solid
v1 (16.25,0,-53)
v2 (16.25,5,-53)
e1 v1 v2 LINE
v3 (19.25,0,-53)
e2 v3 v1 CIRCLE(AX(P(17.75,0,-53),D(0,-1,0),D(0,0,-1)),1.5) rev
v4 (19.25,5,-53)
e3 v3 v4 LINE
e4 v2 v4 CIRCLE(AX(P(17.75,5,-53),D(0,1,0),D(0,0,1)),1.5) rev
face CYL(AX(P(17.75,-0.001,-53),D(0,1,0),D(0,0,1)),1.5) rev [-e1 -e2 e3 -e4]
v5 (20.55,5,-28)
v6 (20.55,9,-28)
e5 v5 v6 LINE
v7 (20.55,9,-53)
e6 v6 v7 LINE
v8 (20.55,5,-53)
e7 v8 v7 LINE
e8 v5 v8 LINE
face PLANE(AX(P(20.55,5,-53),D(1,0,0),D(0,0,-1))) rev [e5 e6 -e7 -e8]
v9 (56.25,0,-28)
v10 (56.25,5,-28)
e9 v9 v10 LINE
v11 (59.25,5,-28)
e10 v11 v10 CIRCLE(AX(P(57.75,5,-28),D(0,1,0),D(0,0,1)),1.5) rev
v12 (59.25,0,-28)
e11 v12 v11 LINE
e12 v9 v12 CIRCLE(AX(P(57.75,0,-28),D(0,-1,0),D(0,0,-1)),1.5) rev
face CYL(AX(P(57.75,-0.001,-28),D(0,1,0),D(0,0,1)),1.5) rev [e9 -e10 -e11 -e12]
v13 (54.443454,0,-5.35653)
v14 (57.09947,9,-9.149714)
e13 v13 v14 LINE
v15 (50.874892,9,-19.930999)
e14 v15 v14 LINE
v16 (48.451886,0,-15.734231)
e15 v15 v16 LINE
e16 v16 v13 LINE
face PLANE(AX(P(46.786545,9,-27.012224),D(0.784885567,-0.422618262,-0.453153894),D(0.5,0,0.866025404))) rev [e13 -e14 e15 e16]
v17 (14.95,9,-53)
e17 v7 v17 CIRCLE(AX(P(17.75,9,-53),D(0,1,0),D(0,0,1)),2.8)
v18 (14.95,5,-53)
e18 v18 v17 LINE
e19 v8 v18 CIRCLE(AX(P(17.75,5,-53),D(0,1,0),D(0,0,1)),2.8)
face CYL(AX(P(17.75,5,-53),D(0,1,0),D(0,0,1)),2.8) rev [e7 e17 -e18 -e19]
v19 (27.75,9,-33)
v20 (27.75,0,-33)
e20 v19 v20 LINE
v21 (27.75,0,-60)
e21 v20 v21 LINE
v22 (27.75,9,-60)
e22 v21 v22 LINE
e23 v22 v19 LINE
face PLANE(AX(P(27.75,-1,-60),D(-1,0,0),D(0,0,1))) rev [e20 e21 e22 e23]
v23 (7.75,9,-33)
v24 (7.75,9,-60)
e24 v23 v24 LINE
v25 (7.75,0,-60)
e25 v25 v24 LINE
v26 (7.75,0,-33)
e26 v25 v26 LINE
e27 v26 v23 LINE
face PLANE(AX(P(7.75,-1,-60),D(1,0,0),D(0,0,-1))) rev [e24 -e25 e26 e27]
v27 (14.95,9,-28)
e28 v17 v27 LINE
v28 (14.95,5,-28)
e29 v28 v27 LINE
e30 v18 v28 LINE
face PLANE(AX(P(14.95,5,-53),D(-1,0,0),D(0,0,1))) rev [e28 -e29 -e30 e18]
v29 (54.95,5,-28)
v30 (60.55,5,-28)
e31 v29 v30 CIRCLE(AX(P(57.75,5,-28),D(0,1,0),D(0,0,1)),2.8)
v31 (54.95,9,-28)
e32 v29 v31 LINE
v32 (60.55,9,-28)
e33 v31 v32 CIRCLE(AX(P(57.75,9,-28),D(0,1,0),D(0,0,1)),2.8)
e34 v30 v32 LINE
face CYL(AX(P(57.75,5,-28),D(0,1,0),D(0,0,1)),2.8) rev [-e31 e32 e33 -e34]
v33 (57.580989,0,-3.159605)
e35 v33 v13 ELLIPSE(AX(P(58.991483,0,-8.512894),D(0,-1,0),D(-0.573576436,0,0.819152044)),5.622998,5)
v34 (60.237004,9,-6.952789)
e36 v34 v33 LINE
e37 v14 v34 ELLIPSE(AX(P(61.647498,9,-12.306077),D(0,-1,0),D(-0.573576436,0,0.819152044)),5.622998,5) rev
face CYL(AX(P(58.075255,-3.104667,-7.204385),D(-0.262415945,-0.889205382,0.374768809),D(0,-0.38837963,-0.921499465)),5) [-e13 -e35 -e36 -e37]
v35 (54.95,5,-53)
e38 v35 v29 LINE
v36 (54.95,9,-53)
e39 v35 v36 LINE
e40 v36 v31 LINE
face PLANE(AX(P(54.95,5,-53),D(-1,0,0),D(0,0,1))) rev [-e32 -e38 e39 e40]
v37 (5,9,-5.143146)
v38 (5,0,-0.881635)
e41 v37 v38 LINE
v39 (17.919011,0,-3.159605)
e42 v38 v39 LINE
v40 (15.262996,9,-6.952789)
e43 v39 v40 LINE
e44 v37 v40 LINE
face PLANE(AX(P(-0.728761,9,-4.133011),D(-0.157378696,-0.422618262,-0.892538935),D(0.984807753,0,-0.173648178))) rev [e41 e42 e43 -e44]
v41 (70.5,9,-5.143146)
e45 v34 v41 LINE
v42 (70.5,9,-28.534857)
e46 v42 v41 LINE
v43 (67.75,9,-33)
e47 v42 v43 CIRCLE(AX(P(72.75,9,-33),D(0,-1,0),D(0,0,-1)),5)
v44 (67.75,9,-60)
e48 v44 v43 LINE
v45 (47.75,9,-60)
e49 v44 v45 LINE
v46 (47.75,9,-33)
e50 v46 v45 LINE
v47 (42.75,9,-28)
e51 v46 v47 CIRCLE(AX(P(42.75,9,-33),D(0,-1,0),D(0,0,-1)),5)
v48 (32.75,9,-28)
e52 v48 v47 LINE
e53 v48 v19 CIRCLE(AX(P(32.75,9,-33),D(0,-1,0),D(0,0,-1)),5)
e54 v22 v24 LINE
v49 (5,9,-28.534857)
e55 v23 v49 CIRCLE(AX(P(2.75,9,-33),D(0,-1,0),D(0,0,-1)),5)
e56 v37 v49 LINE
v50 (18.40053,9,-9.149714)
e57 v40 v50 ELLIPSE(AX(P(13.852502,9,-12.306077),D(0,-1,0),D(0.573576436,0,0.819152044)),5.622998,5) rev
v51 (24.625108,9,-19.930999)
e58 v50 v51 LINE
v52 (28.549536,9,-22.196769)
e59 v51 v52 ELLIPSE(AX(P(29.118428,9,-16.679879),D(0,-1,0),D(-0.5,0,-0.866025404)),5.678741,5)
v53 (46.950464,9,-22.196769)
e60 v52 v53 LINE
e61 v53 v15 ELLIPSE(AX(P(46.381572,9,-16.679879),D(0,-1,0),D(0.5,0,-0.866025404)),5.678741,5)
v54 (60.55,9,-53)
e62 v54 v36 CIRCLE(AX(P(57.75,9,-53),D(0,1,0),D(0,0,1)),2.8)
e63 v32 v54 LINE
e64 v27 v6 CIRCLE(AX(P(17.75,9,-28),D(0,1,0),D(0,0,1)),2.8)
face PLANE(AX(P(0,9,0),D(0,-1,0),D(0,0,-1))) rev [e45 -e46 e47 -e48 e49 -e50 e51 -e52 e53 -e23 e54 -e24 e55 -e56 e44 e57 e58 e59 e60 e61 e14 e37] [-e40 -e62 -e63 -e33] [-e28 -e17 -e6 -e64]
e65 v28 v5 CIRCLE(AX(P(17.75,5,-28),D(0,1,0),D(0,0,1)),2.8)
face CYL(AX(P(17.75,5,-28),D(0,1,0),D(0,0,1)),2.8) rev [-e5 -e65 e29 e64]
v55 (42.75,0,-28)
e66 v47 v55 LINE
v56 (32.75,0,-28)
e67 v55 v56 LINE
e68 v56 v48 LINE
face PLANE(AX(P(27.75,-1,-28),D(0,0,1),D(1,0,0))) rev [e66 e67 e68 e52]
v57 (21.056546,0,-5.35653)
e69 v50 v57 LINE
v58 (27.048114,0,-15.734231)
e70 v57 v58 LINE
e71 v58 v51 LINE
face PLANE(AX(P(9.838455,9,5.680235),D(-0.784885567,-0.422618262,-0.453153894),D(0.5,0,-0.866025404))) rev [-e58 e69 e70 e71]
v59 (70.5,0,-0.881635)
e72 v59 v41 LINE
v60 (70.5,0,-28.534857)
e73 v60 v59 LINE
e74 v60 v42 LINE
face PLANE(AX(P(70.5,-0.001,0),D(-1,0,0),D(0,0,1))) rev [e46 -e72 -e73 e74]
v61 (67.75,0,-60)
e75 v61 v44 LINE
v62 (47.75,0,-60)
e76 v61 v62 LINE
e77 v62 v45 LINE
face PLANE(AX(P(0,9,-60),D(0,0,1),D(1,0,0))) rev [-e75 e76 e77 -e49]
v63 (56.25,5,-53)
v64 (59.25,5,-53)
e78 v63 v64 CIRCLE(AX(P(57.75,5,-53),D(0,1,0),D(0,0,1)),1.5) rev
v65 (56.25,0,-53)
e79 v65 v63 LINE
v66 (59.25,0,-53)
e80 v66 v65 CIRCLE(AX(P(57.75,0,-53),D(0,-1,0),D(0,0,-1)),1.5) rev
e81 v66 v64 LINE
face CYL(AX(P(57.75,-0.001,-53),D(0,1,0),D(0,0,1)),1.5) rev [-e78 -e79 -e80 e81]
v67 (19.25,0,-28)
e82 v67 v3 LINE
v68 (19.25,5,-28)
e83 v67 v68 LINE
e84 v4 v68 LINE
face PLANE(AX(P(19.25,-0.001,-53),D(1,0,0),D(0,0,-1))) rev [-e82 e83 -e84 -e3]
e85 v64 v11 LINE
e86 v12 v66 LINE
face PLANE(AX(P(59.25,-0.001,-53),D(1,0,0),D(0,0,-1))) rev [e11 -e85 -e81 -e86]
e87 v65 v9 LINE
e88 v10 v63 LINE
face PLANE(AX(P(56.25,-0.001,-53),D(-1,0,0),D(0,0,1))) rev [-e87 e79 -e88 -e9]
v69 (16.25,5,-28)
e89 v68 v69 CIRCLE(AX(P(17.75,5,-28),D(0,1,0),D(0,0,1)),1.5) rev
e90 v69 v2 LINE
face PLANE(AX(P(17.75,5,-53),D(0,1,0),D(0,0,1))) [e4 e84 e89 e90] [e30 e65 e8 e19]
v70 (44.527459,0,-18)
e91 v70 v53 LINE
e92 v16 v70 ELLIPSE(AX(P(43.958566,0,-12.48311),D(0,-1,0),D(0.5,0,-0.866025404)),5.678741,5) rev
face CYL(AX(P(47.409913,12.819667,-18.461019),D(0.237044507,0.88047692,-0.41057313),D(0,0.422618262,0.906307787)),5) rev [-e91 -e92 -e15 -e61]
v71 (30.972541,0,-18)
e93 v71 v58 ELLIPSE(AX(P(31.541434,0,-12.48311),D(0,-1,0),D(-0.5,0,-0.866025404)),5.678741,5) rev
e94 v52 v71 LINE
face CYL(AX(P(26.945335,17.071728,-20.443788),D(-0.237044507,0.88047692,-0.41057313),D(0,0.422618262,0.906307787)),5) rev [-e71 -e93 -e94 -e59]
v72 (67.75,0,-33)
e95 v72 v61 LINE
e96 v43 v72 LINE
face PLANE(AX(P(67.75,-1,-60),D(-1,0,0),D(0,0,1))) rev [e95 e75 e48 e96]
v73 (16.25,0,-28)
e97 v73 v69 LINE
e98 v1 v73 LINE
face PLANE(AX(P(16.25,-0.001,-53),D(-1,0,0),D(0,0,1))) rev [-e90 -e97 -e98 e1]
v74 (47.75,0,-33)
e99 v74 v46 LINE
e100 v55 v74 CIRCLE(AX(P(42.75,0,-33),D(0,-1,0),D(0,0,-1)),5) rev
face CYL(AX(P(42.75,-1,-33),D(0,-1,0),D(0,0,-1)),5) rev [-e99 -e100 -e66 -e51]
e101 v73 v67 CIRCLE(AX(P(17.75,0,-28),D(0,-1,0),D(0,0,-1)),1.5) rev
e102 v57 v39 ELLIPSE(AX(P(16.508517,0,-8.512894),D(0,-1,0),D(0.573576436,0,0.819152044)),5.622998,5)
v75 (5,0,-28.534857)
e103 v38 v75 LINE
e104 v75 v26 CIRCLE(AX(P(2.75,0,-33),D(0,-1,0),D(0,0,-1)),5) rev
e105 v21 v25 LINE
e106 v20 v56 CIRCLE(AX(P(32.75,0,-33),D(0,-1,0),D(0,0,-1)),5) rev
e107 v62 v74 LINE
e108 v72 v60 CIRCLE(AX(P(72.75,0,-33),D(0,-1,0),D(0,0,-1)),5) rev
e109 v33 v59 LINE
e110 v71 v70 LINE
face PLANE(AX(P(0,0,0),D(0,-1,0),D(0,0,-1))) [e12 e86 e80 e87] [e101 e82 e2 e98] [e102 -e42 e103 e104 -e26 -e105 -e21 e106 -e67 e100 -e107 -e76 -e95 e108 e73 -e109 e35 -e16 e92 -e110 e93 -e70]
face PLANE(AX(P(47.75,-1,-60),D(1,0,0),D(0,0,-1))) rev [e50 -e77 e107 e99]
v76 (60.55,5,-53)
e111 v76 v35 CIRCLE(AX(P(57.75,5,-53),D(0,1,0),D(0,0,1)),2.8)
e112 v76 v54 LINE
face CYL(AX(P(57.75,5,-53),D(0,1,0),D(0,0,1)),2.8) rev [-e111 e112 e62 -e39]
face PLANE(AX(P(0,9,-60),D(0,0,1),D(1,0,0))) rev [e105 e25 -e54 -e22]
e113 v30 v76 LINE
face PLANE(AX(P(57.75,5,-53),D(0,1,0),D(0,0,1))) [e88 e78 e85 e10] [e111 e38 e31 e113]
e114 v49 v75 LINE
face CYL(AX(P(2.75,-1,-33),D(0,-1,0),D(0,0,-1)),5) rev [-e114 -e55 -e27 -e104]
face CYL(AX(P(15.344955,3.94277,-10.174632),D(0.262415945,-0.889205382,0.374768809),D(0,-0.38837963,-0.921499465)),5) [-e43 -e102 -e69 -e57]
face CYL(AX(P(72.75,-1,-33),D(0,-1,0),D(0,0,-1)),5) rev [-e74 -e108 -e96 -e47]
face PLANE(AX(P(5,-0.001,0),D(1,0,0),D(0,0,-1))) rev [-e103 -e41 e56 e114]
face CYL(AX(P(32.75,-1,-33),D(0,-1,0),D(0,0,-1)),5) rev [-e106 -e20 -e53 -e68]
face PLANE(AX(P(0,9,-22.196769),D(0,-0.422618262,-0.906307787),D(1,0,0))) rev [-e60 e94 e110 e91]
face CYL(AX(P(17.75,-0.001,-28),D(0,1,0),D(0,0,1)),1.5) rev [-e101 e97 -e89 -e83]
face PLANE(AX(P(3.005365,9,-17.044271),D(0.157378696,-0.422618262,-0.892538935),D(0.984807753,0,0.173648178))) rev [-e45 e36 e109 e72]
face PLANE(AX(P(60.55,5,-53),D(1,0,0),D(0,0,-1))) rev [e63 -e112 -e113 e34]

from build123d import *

# Parameters (mm, degrees)
BOSS_EXTRUDE1_DEPTH = 9
CUT_EXTRUDE2_REACH  = 98.857
SKETCH5_W           = 20
SKETCH5_H           = 32
SKETCH5_W_2         = 7.75
CUT_EXTRUDE3_DEPTH  = 10
FILLET1_R           = 5
CUT_EXTRUDE4_DEPTH  = 4
FILLET2_R           = 5
CUT_EXTRUDE5_REACH  = 98.857
SKETCH7_W           = 5
SKETCH7_H           = 33.085129134
SKETCH7_H_2         = 33.745309592


with BuildPart() as part:
    # Sketch1 → Boss-Extrude1 (new body)
    with BuildSketch(Plane(origin=(0, 0, 0), x_dir=(1, 0, 0), z_dir=(0, 1, 0))):
        Polygon((0, 0), (0, 60), (75.5, 60), (75.5, 0), (55.5, 3.526539614), (47.14374375, 18), (28.35625625, 18), (20, 3.526539614), align=None)
    extrude(amount=BOSS_EXTRUDE1_DEPTH)

    # Sketch4 → Cut-Extrude2 (cut, up to next)
    with BuildSketch(Plane(origin=(0, 9, 0), x_dir=(1, 0, 0), z_dir=(0, 1, 0)), mode=Mode.PRIVATE) as cut_extrude2_sk1:
        with BuildLine():
            Line((19.25, 53), (19.25, 28))
            ThreePointArc((19.25, 28), (17.75, 26.5), (16.25, 28))
            Line((16.25, 28), (16.25, 53))
            ThreePointArc((16.25, 53), (17.75, 54.5), (19.25, 53))
        make_face()
    cut_extrude2_tool1 = extrude(cut_extrude2_sk1.sketch, amount=-CUT_EXTRUDE2_REACH, mode=Mode.PRIVATE) & part.part
    # Sketch4 → Cut-Extrude2 (cut, up to next)
    with BuildSketch(Plane(origin=(0, 9, 0), x_dir=(1, 0, 0), z_dir=(0, 1, 0)), mode=Mode.PRIVATE) as cut_extrude2_sk2:
        with BuildLine():
            Line((59.25, 53), (59.25, 28))
            ThreePointArc((59.25, 28), (57.75, 26.5), (56.25, 28))
            Line((56.25, 28), (56.25, 53))
            ThreePointArc((56.25, 53), (57.75, 54.5), (59.25, 53))
        make_face()
    cut_extrude2_tool2 = extrude(cut_extrude2_sk2.sketch, amount=-CUT_EXTRUDE2_REACH, mode=Mode.PRIVATE) & part.part
    add(cut_extrude2_tool1.solids().sort_by_distance((17.75, 9, -40.5))[0], mode=Mode.SUBTRACT)
    add(cut_extrude2_tool2.solids().sort_by_distance((57.75, 9, -40.5))[0], mode=Mode.SUBTRACT)

    # Sketch5 → Cut-Extrude3 (cut)
    with BuildSketch(Plane(origin=(0, 9, 0), x_dir=(1, 0, 0), z_dir=(0, 1, 0))):
        with Locations((37.75, 44)):
            Rectangle(SKETCH5_W, SKETCH5_H)
        with Locations((71.625, 44)):
            Rectangle(SKETCH5_W_2, SKETCH5_H)
        with Locations((3.875, 44)):
            Rectangle(SKETCH5_W_2, SKETCH5_H)
    extrude(amount=-CUT_EXTRUDE3_DEPTH, mode=Mode.SUBTRACT)

    # Fillet1
    fillet1_edges = [part.edges().sort_by_distance(p)[0] for p in [
        (27.75, 4.5, -28),
        (47.75, 4.5, -28),
        (7.75, 4.5, -28),
        (67.75, 4.5, -28),
    ]]
    fillet(fillet1_edges, radius=FILLET1_R)

    # Sketch6 → Cut-Extrude4 (cut)
    with BuildSketch(Plane(origin=(0, 9, 0), x_dir=(1, 0, 0), z_dir=(0, 1, 0))):
        with BuildLine():
            Line((20.55, 53), (20.55, 28))
            ThreePointArc((20.55, 28), (17.75, 25.2), (14.95, 28))
            Line((14.95, 28), (14.95, 53))
            ThreePointArc((14.95, 53), (17.75, 55.8), (20.55, 53))
        make_face()
        with BuildLine():
            Line((60.55, 53), (60.55, 28))
            ThreePointArc((60.55, 28), (57.75, 25.2), (54.95, 28))
            Line((54.95, 28), (54.95, 53))
            ThreePointArc((54.95, 53), (57.75, 55.8), (60.55, 53))
        make_face()
    extrude(amount=-CUT_EXTRUDE4_DEPTH, mode=Mode.SUBTRACT)

    # Chamfer1
    # the kernel refuses this chamfer: 9, 4.196768923 mm, written as the material it takes off along each edge
    with BuildSketch(Plane(origin=(98.464514589, 9, 4.049263521), x_dir=(-0.002832403926993569, -0.9998669641130703, 0.016063360896972027), z_dir=(-0.9848077530122074, 0, -0.17364817766693463))) as chamfer1_piece_1_section:
        with BuildLine():
            Line((9.327511697, 0), (-0.397163207, -4.34301108))
            Line((-0.397163207, -4.34301108), (-0.57713926, -4.34007507))
            ThreePointArc((-0.57713926, -4.34007507), (-0.215443958, -2.171230459), (-0.179976054, 0.00293601))
            Line((-0.179976054, 0.00293601), (0.00293601, 0.179976054))
            ThreePointArc((0.00293601, 0.179976054), (4.665451047, 0.103914887), (9.330447707, 0.179976054))
            Line((9.330447707, 0.179976054), (9.327511697, 0))
        make_face()
    chamfer1_piece_1 = extrude(amount=66.946090723, mode=Mode.PRIVATE)
    chamfer1_piece_1 = split(chamfer1_piece_1, bisect_by=Plane(origin=(75.5, 5.998922667, -3.223017073), z_dir=(-1, 0, 0)), keep=Keep.TOP, mode=Mode.PRIVATE)
    chamfer1_piece_1 = split(chamfer1_piece_1, bisect_by=Plane(origin=(58.020430992, 5.998922667, 0.83897492), z_dir=(0.8660254037844379, 0, -0.5000000000000017)), keep=Keep.TOP, mode=Mode.PRIVATE)
    add(chamfer1_piece_1, mode=Mode.SUBTRACT)
    with BuildSketch(Plane(origin=(42.964514589, 9, -7.575803135), x_dir=(0.002832403926993593, -0.9998669641130703, 0.01606336089697216), z_dir=(-0.9848077530122074, 0, 0.1736481776669347))) as chamfer1_piece_2_section:
        with BuildLine():
            Line((9.327511697, 0), (-0.397163207, -4.34301108))
            Line((-0.397163207, -4.34301108), (-0.57713926, -4.34007507))
            ThreePointArc((-0.57713926, -4.34007507), (-0.215443958, -2.171230459), (-0.179976054, 0.00293601))
            Line((-0.179976054, 0.00293601), (0.00293601, 0.179976054))
            ThreePointArc((0.00293601, 0.179976054), (4.665451047, 0.103914887), (9.330447707, 0.179976054))
            Line((9.330447707, 0.179976054), (9.327511697, 0))
        make_face()
    chamfer1_piece_2 = extrude(amount=66.946090723, mode=Mode.PRIVATE)
    chamfer1_piece_2 = split(chamfer1_piece_2, bisect_by=Plane(origin=(17.479569008, 5.998922667, 0.83897492), z_dir=(-0.8660254037844382, 0, -0.500000000000001)), keep=Keep.TOP, mode=Mode.PRIVATE)
    chamfer1_piece_2 = split(chamfer1_piece_2, bisect_by=Plane(origin=(0, 5.998922667, -3.223017073), z_dir=(1, 0, 0)), keep=Keep.TOP, mode=Mode.PRIVATE)
    add(chamfer1_piece_2, mode=Mode.SUBTRACT)
    with BuildSketch(Plane(origin=(67.159389621, 9, 16.668115595), x_dir=(-0.014125882502839455, -0.9998669641130703, 0.008155582065555418), z_dir=(-0.5000000000000017, 0, -0.8660254037844378))) as chamfer1_piece_3_section:
        with BuildLine():
            Line((9.327511697, 0), (-0.397163207, -4.34301108))
            Line((-0.397163207, -4.34301108), (-0.57713926, -4.34007507))
            ThreePointArc((-0.57713926, -4.34007507), (-0.215443958, -2.171230459), (-0.179976054, 0.00293601))
            Line((-0.179976054, 0.00293601), (0.00293601, 0.179976054))
            ThreePointArc((0.00293601, 0.179976054), (4.665451047, 0.103914887), (9.330447707, 0.179976054))
            Line((9.330447707, 0.179976054), (9.327511697, 0))
        make_face()
    chamfer1_piece_3 = extrude(amount=63.350070985, mode=Mode.PRIVATE)
    chamfer1_piece_3 = split(chamfer1_piece_3, bisect_by=Plane(origin=(51.823877601, 5.976991007, -4.174739178), z_dir=(0.17364817766693463, 0, -0.9848077530122074)), keep=Keep.TOP, mode=Mode.PRIVATE)
    chamfer1_piece_3 = split(chamfer1_piece_3, bisect_by=Plane(origin=(52.958801504, 5.976991007, -18), z_dir=(0, 0, 1)), keep=Keep.TOP, mode=Mode.PRIVATE)
    add(chamfer1_piece_3, mode=Mode.SUBTRACT)
    with BuildSketch(Plane(origin=(70.462522993, 9, -18), x_dir=(0, -0.9998669641130703, 0.01631116413111029), z_dir=(-1, 0, 0))) as chamfer1_piece_4_section:
        with BuildLine():
            Line((9.327511697, 0), (-0.397163207, -4.34301108))
            Line((-0.397163207, -4.34301108), (-0.57713926, -4.34007507))
            ThreePointArc((-0.57713926, -4.34007507), (-0.215443958, -2.171230459), (-0.179976054, 0.00293601))
            Line((-0.179976054, 0.00293601), (0.00293601, 0.179976054))
            ThreePointArc((0.00293601, 0.179976054), (4.665451047, 0.103914887), (9.330447707, 0.179976054))
            Line((9.330447707, 0.179976054), (9.327511697, 0))
        make_face()
    chamfer1_piece_4 = extrude(amount=65.425045986, mode=Mode.PRIVATE)
    chamfer1_piece_4 = split(chamfer1_piece_4, bisect_by=Plane(origin=(44.256558159, 5.863829833, -23.000752134), z_dir=(-0.8660254037844379, 0, 0.5000000000000017)), keep=Keep.TOP, mode=Mode.PRIVATE)
    chamfer1_piece_4 = split(chamfer1_piece_4, bisect_by=Plane(origin=(31.243441841, 5.863829833, -23.000752134), z_dir=(0.8660254037844382, 0, 0.500000000000001)), keep=Keep.TOP, mode=Mode.PRIVATE)
    add(chamfer1_piece_4, mode=Mode.SUBTRACT)
    with BuildSketch(Plane(origin=(40.015645871, 9, -38.19465521), x_dir=(0.014125882502839221, -0.9998669641130703, 0.00815558206555527), z_dir=(-0.5000000000000009, 0, 0.866025403784438))) as chamfer1_piece_5_section:
        with BuildLine():
            Line((9.327511697, 0), (-0.397163207, -4.34301108))
            Line((-0.397163207, -4.34301108), (-0.57713926, -4.34007507))
            ThreePointArc((-0.57713926, -4.34007507), (-0.215443958, -2.171230459), (-0.179976054, 0.00293601))
            Line((-0.179976054, 0.00293601), (0.00293601, 0.179976054))
            ThreePointArc((0.00293601, 0.179976054), (4.665451047, 0.103914887), (9.330447707, 0.179976054))
            Line((9.330447707, 0.179976054), (9.327511697, 0))
        make_face()
    chamfer1_piece_5 = extrude(amount=63.350070985, mode=Mode.PRIVATE)
    chamfer1_piece_5 = split(chamfer1_piece_5, bisect_by=Plane(origin=(22.541198496, 5.976991007, -18), z_dir=(0, 0, 1)), keep=Keep.TOP, mode=Mode.PRIVATE)
    chamfer1_piece_5 = split(chamfer1_piece_5, bisect_by=Plane(origin=(23.676122399, 5.976991007, -4.174739178), z_dir=(-0.1736481776669347, 0, -0.9848077530122074)), keep=Keep.TOP, mode=Mode.PRIVATE)
    add(chamfer1_piece_5, mode=Mode.SUBTRACT)
    with BuildSketch(Plane(origin=(98.464514589, 9, 4.049263521), x_dir=(-0.002832403926993569, -0.9998669641130703, 0.016063360896972027), z_dir=(-0.9848077530122074, 0, -0.17364817766693463))) as chamfer1_piece_6a_section:
        with BuildLine():
            Line((9.327511697, 0), (-0.397163207, -4.34301108))
            Line((-0.397163207, -4.34301108), (-0.57713926, -4.34007507))
            ThreePointArc((-0.57713926, -4.34007507), (-0.215443958, -2.171230459), (-0.179976054, 0.00293601))
            Line((-0.179976054, 0.00293601), (0.00293601, 0.179976054))
            ThreePointArc((0.00293601, 0.179976054), (4.665451047, 0.103914887), (9.330447707, 0.179976054))
            Line((9.330447707, 0.179976054), (9.327511697, 0))
        make_face()
    chamfer1_piece_6a = extrude(amount=66.946090723, mode=Mode.PRIVATE)
    chamfer1_piece_6a = split(chamfer1_piece_6a, bisect_by=Plane(origin=(51.090565692, 5.903894994, -11.163903869), z_dir=(-0.8660254037844379, 0, 0.5000000000000017)), keep=Keep.TOP, mode=Mode.PRIVATE)
    with BuildSketch(Plane(origin=(67.159389621, 9, 16.668115595), x_dir=(-0.014125882502839455, -0.9998669641130703, 0.008155582065555418), z_dir=(-0.5000000000000017, 0, -0.8660254037844378))) as chamfer1_piece_6b_section:
        with BuildLine():
            Line((9.327511697, 0), (-0.397163207, -4.34301108))
            Line((-0.397163207, -4.34301108), (-0.57713926, -4.34007507))
            ThreePointArc((-0.57713926, -4.34007507), (-0.215443958, -2.171230459), (-0.179976054, 0.00293601))
            Line((-0.179976054, 0.00293601), (0.00293601, 0.179976054))
            ThreePointArc((0.00293601, 0.179976054), (4.665451047, 0.103914887), (9.330447707, 0.179976054))
            Line((9.330447707, 0.179976054), (9.327511697, 0))
        make_face()
    chamfer1_piece_6b = extrude(amount=63.350070985, mode=Mode.PRIVATE)
    chamfer1_piece_6b = split(chamfer1_piece_6b, bisect_by=Plane(origin=(64.184890186, 5.903894994, -1.99515915), z_dir=(-0.17364817766693463, 0, 0.9848077530122074)), keep=Keep.TOP, mode=Mode.PRIVATE)
    chamfer1_piece_6 = chamfer1_piece_6a & chamfer1_piece_6b
    add(chamfer1_piece_6, mode=Mode.SUBTRACT)
    with BuildSketch(Plane(origin=(40.015645871, 9, -38.19465521), x_dir=(0.014125882502839221, -0.9998669641130703, 0.00815558206555527), z_dir=(-0.5000000000000009, 0, 0.866025403784438))) as chamfer1_piece_7a_section:
        with BuildLine():
            Line((9.327511697, 0), (-0.397163207, -4.34301108))
            Line((-0.397163207, -4.34301108), (-0.57713926, -4.34007507))
            ThreePointArc((-0.57713926, -4.34007507), (-0.215443958, -2.171230459), (-0.179976054, 0.00293601))
            Line((-0.179976054, 0.00293601), (0.00293601, 0.179976054))
            ThreePointArc((0.00293601, 0.179976054), (4.665451047, 0.103914887), (9.330447707, 0.179976054))
            Line((9.330447707, 0.179976054), (9.327511697, 0))
        make_face()
    chamfer1_piece_7a = extrude(amount=63.350070985, mode=Mode.PRIVATE)
    chamfer1_piece_7a = split(chamfer1_piece_7a, bisect_by=Plane(origin=(11.315109814, 5.903894994, -1.99515915), z_dir=(0.1736481776669347, 0, 0.9848077530122074)), keep=Keep.TOP, mode=Mode.PRIVATE)
    with BuildSketch(Plane(origin=(42.964514589, 9, -7.575803135), x_dir=(0.002832403926993593, -0.9998669641130703, 0.01606336089697216), z_dir=(-0.9848077530122074, 0, 0.1736481776669347))) as chamfer1_piece_7b_section:
        with BuildLine():
            Line((9.327511697, 0), (-0.397163207, -4.34301108))
            Line((-0.397163207, -4.34301108), (-0.57713926, -4.34007507))
            ThreePointArc((-0.57713926, -4.34007507), (-0.215443958, -2.171230459), (-0.179976054, 0.00293601))
            Line((-0.179976054, 0.00293601), (0.00293601, 0.179976054))
            ThreePointArc((0.00293601, 0.179976054), (4.665451047, 0.103914887), (9.330447707, 0.179976054))
            Line((9.330447707, 0.179976054), (9.327511697, 0))
        make_face()
    chamfer1_piece_7b = extrude(amount=66.946090723, mode=Mode.PRIVATE)
    chamfer1_piece_7b = split(chamfer1_piece_7b, bisect_by=Plane(origin=(24.409434308, 5.903894994, -11.163903869), z_dir=(0.8660254037844382, 0, 0.500000000000001)), keep=Keep.TOP, mode=Mode.PRIVATE)
    chamfer1_piece_7 = chamfer1_piece_7a & chamfer1_piece_7b
    add(chamfer1_piece_7, mode=Mode.SUBTRACT)
    with BuildSketch(Plane(origin=(67.159389621, 9, 16.668115595), x_dir=(-0.014125882502839455, -0.9998669641130703, 0.008155582065555418), z_dir=(-0.5000000000000017, 0, -0.8660254037844378))) as chamfer1_piece_8a_section:
        with BuildLine():
            Line((9.327511697, 0), (-0.397163207, -4.34301108))
            Line((-0.397163207, -4.34301108), (-0.57713926, -4.34007507))
            ThreePointArc((-0.57713926, -4.34007507), (-0.215443958, -2.171230459), (-0.179976054, 0.00293601))
            Line((-0.179976054, 0.00293601), (0.00293601, 0.179976054))
            ThreePointArc((0.00293601, 0.179976054), (4.665451047, 0.103914887), (9.330447707, 0.179976054))
            Line((9.330447707, 0.179976054), (9.327511697, 0))
        make_face()
    chamfer1_piece_8a = extrude(amount=63.350070985, mode=Mode.PRIVATE)
    chamfer1_piece_8a = split(chamfer1_piece_8a, bisect_by=Plane(origin=(42.679871827, 5.988864312, -18), z_dir=(0, 0, -1)), keep=Keep.TOP, mode=Mode.PRIVATE)
    with BuildSketch(Plane(origin=(70.462522993, 9, -18), x_dir=(0, -0.9998669641130703, 0.01631116413111029), z_dir=(-1, 0, 0))) as chamfer1_piece_8b_section:
        with BuildLine():
            Line((9.327511697, 0), (-0.397163207, -4.34301108))
            Line((-0.397163207, -4.34301108), (-0.57713926, -4.34007507))
            ThreePointArc((-0.57713926, -4.34007507), (-0.215443958, -2.171230459), (-0.179976054, 0.00293601))
            Line((-0.179976054, 0.00293601), (0.00293601, 0.179976054))
            ThreePointArc((0.00293601, 0.179976054), (4.665451047, 0.103914887), (9.330447707, 0.179976054))
            Line((9.330447707, 0.179976054), (9.327511697, 0))
        make_face()
    chamfer1_piece_8b = extrude(amount=65.425045986, mode=Mode.PRIVATE)
    chamfer1_piece_8b = split(chamfer1_piece_8b, bisect_by=Plane(origin=(49.375679712, 5.988864312, -14.134173515), z_dir=(0.8660254037844379, 0, -0.5000000000000017)), keep=Keep.TOP, mode=Mode.PRIVATE)
    chamfer1_piece_8 = chamfer1_piece_8a & chamfer1_piece_8b
    add(chamfer1_piece_8, mode=Mode.SUBTRACT)
    with BuildSketch(Plane(origin=(70.462522993, 9, -18), x_dir=(0, -0.9998669641130703, 0.01631116413111029), z_dir=(-1, 0, 0))) as chamfer1_piece_9a_section:
        with BuildLine():
            Line((9.327511697, 0), (-0.397163207, -4.34301108))
            Line((-0.397163207, -4.34301108), (-0.57713926, -4.34007507))
            ThreePointArc((-0.57713926, -4.34007507), (-0.215443958, -2.171230459), (-0.179976054, 0.00293601))
            Line((-0.179976054, 0.00293601), (0.00293601, 0.179976054))
            ThreePointArc((0.00293601, 0.179976054), (4.665451047, 0.103914887), (9.330447707, 0.179976054))
            Line((9.330447707, 0.179976054), (9.327511697, 0))
        make_face()
    chamfer1_piece_9a = extrude(amount=65.425045986, mode=Mode.PRIVATE)
    chamfer1_piece_9a = split(chamfer1_piece_9a, bisect_by=Plane(origin=(26.124320288, 5.988864312, -14.134173515), z_dir=(-0.8660254037844382, 0, -0.500000000000001)), keep=Keep.TOP, mode=Mode.PRIVATE)
    with BuildSketch(Plane(origin=(40.015645871, 9, -38.19465521), x_dir=(0.014125882502839221, -0.9998669641130703, 0.00815558206555527), z_dir=(-0.5000000000000009, 0, 0.866025403784438))) as chamfer1_piece_9b_section:
        with BuildLine():
            Line((9.327511697, 0), (-0.397163207, -4.34301108))
            Line((-0.397163207, -4.34301108), (-0.57713926, -4.34007507))
            ThreePointArc((-0.57713926, -4.34007507), (-0.215443958, -2.171230459), (-0.179976054, 0.00293601))
            Line((-0.179976054, 0.00293601), (0.00293601, 0.179976054))
            ThreePointArc((0.00293601, 0.179976054), (4.665451047, 0.103914887), (9.330447707, 0.179976054))
            Line((9.330447707, 0.179976054), (9.327511697, 0))
        make_face()
    chamfer1_piece_9b = extrude(amount=63.350070985, mode=Mode.PRIVATE)
    chamfer1_piece_9b = split(chamfer1_piece_9b, bisect_by=Plane(origin=(32.820128173, 5.988864312, -18), z_dir=(0, 0, -1)), keep=Keep.TOP, mode=Mode.PRIVATE)
    chamfer1_piece_9 = chamfer1_piece_9a & chamfer1_piece_9b
    add(chamfer1_piece_9, mode=Mode.SUBTRACT)

    # Fillet2
    fillet2_edges = [part.edges().sort_by_distance(p)[0] for p in [
        (18.671992121, 4.5, -5.423131419),
        (27.144753416, 4.5, -20.098384462),
        (48.355246584, 4.5, -20.098384462),
        (56.828007879, 4.5, -5.423131419),
    ]]
    fillet(fillet2_edges, radius=FILLET2_R)

    # Sketch7 → Cut-Extrude5 (cut, up to next)
    with BuildSketch(Plane(origin=(0, 9, 0), x_dir=(1, 0, 0), z_dir=(0, 1, 0)), mode=Mode.PRIVATE) as cut_extrude5_sk1:
        with Locations((2.5, 16.542564567)):
            Rectangle(SKETCH7_W, SKETCH7_H)
    cut_extrude5_tool1 = extrude(cut_extrude5_sk1.sketch, amount=-CUT_EXTRUDE5_REACH, mode=Mode.PRIVATE) & part.part
    # Sketch7 → Cut-Extrude5 (cut, up to next)
    with BuildSketch(Plane(origin=(0, 9, 0), x_dir=(1, 0, 0), z_dir=(0, 1, 0)), mode=Mode.PRIVATE) as cut_extrude5_sk2:
        with Locations((73, 16.872654796)):
            Rectangle(SKETCH7_W, SKETCH7_H_2)
    cut_extrude5_tool2 = extrude(cut_extrude5_sk2.sketch, amount=-CUT_EXTRUDE5_REACH, mode=Mode.PRIVATE) & part.part
    add(cut_extrude5_tool1.solids().sort_by_distance((2.5, 9, -16.542565))[0], mode=Mode.SUBTRACT)
    add(cut_extrude5_tool2.solids().sort_by_distance((73, 9, -16.872655))[0], mode=Mode.SUBTRACT)


solid = part.part
